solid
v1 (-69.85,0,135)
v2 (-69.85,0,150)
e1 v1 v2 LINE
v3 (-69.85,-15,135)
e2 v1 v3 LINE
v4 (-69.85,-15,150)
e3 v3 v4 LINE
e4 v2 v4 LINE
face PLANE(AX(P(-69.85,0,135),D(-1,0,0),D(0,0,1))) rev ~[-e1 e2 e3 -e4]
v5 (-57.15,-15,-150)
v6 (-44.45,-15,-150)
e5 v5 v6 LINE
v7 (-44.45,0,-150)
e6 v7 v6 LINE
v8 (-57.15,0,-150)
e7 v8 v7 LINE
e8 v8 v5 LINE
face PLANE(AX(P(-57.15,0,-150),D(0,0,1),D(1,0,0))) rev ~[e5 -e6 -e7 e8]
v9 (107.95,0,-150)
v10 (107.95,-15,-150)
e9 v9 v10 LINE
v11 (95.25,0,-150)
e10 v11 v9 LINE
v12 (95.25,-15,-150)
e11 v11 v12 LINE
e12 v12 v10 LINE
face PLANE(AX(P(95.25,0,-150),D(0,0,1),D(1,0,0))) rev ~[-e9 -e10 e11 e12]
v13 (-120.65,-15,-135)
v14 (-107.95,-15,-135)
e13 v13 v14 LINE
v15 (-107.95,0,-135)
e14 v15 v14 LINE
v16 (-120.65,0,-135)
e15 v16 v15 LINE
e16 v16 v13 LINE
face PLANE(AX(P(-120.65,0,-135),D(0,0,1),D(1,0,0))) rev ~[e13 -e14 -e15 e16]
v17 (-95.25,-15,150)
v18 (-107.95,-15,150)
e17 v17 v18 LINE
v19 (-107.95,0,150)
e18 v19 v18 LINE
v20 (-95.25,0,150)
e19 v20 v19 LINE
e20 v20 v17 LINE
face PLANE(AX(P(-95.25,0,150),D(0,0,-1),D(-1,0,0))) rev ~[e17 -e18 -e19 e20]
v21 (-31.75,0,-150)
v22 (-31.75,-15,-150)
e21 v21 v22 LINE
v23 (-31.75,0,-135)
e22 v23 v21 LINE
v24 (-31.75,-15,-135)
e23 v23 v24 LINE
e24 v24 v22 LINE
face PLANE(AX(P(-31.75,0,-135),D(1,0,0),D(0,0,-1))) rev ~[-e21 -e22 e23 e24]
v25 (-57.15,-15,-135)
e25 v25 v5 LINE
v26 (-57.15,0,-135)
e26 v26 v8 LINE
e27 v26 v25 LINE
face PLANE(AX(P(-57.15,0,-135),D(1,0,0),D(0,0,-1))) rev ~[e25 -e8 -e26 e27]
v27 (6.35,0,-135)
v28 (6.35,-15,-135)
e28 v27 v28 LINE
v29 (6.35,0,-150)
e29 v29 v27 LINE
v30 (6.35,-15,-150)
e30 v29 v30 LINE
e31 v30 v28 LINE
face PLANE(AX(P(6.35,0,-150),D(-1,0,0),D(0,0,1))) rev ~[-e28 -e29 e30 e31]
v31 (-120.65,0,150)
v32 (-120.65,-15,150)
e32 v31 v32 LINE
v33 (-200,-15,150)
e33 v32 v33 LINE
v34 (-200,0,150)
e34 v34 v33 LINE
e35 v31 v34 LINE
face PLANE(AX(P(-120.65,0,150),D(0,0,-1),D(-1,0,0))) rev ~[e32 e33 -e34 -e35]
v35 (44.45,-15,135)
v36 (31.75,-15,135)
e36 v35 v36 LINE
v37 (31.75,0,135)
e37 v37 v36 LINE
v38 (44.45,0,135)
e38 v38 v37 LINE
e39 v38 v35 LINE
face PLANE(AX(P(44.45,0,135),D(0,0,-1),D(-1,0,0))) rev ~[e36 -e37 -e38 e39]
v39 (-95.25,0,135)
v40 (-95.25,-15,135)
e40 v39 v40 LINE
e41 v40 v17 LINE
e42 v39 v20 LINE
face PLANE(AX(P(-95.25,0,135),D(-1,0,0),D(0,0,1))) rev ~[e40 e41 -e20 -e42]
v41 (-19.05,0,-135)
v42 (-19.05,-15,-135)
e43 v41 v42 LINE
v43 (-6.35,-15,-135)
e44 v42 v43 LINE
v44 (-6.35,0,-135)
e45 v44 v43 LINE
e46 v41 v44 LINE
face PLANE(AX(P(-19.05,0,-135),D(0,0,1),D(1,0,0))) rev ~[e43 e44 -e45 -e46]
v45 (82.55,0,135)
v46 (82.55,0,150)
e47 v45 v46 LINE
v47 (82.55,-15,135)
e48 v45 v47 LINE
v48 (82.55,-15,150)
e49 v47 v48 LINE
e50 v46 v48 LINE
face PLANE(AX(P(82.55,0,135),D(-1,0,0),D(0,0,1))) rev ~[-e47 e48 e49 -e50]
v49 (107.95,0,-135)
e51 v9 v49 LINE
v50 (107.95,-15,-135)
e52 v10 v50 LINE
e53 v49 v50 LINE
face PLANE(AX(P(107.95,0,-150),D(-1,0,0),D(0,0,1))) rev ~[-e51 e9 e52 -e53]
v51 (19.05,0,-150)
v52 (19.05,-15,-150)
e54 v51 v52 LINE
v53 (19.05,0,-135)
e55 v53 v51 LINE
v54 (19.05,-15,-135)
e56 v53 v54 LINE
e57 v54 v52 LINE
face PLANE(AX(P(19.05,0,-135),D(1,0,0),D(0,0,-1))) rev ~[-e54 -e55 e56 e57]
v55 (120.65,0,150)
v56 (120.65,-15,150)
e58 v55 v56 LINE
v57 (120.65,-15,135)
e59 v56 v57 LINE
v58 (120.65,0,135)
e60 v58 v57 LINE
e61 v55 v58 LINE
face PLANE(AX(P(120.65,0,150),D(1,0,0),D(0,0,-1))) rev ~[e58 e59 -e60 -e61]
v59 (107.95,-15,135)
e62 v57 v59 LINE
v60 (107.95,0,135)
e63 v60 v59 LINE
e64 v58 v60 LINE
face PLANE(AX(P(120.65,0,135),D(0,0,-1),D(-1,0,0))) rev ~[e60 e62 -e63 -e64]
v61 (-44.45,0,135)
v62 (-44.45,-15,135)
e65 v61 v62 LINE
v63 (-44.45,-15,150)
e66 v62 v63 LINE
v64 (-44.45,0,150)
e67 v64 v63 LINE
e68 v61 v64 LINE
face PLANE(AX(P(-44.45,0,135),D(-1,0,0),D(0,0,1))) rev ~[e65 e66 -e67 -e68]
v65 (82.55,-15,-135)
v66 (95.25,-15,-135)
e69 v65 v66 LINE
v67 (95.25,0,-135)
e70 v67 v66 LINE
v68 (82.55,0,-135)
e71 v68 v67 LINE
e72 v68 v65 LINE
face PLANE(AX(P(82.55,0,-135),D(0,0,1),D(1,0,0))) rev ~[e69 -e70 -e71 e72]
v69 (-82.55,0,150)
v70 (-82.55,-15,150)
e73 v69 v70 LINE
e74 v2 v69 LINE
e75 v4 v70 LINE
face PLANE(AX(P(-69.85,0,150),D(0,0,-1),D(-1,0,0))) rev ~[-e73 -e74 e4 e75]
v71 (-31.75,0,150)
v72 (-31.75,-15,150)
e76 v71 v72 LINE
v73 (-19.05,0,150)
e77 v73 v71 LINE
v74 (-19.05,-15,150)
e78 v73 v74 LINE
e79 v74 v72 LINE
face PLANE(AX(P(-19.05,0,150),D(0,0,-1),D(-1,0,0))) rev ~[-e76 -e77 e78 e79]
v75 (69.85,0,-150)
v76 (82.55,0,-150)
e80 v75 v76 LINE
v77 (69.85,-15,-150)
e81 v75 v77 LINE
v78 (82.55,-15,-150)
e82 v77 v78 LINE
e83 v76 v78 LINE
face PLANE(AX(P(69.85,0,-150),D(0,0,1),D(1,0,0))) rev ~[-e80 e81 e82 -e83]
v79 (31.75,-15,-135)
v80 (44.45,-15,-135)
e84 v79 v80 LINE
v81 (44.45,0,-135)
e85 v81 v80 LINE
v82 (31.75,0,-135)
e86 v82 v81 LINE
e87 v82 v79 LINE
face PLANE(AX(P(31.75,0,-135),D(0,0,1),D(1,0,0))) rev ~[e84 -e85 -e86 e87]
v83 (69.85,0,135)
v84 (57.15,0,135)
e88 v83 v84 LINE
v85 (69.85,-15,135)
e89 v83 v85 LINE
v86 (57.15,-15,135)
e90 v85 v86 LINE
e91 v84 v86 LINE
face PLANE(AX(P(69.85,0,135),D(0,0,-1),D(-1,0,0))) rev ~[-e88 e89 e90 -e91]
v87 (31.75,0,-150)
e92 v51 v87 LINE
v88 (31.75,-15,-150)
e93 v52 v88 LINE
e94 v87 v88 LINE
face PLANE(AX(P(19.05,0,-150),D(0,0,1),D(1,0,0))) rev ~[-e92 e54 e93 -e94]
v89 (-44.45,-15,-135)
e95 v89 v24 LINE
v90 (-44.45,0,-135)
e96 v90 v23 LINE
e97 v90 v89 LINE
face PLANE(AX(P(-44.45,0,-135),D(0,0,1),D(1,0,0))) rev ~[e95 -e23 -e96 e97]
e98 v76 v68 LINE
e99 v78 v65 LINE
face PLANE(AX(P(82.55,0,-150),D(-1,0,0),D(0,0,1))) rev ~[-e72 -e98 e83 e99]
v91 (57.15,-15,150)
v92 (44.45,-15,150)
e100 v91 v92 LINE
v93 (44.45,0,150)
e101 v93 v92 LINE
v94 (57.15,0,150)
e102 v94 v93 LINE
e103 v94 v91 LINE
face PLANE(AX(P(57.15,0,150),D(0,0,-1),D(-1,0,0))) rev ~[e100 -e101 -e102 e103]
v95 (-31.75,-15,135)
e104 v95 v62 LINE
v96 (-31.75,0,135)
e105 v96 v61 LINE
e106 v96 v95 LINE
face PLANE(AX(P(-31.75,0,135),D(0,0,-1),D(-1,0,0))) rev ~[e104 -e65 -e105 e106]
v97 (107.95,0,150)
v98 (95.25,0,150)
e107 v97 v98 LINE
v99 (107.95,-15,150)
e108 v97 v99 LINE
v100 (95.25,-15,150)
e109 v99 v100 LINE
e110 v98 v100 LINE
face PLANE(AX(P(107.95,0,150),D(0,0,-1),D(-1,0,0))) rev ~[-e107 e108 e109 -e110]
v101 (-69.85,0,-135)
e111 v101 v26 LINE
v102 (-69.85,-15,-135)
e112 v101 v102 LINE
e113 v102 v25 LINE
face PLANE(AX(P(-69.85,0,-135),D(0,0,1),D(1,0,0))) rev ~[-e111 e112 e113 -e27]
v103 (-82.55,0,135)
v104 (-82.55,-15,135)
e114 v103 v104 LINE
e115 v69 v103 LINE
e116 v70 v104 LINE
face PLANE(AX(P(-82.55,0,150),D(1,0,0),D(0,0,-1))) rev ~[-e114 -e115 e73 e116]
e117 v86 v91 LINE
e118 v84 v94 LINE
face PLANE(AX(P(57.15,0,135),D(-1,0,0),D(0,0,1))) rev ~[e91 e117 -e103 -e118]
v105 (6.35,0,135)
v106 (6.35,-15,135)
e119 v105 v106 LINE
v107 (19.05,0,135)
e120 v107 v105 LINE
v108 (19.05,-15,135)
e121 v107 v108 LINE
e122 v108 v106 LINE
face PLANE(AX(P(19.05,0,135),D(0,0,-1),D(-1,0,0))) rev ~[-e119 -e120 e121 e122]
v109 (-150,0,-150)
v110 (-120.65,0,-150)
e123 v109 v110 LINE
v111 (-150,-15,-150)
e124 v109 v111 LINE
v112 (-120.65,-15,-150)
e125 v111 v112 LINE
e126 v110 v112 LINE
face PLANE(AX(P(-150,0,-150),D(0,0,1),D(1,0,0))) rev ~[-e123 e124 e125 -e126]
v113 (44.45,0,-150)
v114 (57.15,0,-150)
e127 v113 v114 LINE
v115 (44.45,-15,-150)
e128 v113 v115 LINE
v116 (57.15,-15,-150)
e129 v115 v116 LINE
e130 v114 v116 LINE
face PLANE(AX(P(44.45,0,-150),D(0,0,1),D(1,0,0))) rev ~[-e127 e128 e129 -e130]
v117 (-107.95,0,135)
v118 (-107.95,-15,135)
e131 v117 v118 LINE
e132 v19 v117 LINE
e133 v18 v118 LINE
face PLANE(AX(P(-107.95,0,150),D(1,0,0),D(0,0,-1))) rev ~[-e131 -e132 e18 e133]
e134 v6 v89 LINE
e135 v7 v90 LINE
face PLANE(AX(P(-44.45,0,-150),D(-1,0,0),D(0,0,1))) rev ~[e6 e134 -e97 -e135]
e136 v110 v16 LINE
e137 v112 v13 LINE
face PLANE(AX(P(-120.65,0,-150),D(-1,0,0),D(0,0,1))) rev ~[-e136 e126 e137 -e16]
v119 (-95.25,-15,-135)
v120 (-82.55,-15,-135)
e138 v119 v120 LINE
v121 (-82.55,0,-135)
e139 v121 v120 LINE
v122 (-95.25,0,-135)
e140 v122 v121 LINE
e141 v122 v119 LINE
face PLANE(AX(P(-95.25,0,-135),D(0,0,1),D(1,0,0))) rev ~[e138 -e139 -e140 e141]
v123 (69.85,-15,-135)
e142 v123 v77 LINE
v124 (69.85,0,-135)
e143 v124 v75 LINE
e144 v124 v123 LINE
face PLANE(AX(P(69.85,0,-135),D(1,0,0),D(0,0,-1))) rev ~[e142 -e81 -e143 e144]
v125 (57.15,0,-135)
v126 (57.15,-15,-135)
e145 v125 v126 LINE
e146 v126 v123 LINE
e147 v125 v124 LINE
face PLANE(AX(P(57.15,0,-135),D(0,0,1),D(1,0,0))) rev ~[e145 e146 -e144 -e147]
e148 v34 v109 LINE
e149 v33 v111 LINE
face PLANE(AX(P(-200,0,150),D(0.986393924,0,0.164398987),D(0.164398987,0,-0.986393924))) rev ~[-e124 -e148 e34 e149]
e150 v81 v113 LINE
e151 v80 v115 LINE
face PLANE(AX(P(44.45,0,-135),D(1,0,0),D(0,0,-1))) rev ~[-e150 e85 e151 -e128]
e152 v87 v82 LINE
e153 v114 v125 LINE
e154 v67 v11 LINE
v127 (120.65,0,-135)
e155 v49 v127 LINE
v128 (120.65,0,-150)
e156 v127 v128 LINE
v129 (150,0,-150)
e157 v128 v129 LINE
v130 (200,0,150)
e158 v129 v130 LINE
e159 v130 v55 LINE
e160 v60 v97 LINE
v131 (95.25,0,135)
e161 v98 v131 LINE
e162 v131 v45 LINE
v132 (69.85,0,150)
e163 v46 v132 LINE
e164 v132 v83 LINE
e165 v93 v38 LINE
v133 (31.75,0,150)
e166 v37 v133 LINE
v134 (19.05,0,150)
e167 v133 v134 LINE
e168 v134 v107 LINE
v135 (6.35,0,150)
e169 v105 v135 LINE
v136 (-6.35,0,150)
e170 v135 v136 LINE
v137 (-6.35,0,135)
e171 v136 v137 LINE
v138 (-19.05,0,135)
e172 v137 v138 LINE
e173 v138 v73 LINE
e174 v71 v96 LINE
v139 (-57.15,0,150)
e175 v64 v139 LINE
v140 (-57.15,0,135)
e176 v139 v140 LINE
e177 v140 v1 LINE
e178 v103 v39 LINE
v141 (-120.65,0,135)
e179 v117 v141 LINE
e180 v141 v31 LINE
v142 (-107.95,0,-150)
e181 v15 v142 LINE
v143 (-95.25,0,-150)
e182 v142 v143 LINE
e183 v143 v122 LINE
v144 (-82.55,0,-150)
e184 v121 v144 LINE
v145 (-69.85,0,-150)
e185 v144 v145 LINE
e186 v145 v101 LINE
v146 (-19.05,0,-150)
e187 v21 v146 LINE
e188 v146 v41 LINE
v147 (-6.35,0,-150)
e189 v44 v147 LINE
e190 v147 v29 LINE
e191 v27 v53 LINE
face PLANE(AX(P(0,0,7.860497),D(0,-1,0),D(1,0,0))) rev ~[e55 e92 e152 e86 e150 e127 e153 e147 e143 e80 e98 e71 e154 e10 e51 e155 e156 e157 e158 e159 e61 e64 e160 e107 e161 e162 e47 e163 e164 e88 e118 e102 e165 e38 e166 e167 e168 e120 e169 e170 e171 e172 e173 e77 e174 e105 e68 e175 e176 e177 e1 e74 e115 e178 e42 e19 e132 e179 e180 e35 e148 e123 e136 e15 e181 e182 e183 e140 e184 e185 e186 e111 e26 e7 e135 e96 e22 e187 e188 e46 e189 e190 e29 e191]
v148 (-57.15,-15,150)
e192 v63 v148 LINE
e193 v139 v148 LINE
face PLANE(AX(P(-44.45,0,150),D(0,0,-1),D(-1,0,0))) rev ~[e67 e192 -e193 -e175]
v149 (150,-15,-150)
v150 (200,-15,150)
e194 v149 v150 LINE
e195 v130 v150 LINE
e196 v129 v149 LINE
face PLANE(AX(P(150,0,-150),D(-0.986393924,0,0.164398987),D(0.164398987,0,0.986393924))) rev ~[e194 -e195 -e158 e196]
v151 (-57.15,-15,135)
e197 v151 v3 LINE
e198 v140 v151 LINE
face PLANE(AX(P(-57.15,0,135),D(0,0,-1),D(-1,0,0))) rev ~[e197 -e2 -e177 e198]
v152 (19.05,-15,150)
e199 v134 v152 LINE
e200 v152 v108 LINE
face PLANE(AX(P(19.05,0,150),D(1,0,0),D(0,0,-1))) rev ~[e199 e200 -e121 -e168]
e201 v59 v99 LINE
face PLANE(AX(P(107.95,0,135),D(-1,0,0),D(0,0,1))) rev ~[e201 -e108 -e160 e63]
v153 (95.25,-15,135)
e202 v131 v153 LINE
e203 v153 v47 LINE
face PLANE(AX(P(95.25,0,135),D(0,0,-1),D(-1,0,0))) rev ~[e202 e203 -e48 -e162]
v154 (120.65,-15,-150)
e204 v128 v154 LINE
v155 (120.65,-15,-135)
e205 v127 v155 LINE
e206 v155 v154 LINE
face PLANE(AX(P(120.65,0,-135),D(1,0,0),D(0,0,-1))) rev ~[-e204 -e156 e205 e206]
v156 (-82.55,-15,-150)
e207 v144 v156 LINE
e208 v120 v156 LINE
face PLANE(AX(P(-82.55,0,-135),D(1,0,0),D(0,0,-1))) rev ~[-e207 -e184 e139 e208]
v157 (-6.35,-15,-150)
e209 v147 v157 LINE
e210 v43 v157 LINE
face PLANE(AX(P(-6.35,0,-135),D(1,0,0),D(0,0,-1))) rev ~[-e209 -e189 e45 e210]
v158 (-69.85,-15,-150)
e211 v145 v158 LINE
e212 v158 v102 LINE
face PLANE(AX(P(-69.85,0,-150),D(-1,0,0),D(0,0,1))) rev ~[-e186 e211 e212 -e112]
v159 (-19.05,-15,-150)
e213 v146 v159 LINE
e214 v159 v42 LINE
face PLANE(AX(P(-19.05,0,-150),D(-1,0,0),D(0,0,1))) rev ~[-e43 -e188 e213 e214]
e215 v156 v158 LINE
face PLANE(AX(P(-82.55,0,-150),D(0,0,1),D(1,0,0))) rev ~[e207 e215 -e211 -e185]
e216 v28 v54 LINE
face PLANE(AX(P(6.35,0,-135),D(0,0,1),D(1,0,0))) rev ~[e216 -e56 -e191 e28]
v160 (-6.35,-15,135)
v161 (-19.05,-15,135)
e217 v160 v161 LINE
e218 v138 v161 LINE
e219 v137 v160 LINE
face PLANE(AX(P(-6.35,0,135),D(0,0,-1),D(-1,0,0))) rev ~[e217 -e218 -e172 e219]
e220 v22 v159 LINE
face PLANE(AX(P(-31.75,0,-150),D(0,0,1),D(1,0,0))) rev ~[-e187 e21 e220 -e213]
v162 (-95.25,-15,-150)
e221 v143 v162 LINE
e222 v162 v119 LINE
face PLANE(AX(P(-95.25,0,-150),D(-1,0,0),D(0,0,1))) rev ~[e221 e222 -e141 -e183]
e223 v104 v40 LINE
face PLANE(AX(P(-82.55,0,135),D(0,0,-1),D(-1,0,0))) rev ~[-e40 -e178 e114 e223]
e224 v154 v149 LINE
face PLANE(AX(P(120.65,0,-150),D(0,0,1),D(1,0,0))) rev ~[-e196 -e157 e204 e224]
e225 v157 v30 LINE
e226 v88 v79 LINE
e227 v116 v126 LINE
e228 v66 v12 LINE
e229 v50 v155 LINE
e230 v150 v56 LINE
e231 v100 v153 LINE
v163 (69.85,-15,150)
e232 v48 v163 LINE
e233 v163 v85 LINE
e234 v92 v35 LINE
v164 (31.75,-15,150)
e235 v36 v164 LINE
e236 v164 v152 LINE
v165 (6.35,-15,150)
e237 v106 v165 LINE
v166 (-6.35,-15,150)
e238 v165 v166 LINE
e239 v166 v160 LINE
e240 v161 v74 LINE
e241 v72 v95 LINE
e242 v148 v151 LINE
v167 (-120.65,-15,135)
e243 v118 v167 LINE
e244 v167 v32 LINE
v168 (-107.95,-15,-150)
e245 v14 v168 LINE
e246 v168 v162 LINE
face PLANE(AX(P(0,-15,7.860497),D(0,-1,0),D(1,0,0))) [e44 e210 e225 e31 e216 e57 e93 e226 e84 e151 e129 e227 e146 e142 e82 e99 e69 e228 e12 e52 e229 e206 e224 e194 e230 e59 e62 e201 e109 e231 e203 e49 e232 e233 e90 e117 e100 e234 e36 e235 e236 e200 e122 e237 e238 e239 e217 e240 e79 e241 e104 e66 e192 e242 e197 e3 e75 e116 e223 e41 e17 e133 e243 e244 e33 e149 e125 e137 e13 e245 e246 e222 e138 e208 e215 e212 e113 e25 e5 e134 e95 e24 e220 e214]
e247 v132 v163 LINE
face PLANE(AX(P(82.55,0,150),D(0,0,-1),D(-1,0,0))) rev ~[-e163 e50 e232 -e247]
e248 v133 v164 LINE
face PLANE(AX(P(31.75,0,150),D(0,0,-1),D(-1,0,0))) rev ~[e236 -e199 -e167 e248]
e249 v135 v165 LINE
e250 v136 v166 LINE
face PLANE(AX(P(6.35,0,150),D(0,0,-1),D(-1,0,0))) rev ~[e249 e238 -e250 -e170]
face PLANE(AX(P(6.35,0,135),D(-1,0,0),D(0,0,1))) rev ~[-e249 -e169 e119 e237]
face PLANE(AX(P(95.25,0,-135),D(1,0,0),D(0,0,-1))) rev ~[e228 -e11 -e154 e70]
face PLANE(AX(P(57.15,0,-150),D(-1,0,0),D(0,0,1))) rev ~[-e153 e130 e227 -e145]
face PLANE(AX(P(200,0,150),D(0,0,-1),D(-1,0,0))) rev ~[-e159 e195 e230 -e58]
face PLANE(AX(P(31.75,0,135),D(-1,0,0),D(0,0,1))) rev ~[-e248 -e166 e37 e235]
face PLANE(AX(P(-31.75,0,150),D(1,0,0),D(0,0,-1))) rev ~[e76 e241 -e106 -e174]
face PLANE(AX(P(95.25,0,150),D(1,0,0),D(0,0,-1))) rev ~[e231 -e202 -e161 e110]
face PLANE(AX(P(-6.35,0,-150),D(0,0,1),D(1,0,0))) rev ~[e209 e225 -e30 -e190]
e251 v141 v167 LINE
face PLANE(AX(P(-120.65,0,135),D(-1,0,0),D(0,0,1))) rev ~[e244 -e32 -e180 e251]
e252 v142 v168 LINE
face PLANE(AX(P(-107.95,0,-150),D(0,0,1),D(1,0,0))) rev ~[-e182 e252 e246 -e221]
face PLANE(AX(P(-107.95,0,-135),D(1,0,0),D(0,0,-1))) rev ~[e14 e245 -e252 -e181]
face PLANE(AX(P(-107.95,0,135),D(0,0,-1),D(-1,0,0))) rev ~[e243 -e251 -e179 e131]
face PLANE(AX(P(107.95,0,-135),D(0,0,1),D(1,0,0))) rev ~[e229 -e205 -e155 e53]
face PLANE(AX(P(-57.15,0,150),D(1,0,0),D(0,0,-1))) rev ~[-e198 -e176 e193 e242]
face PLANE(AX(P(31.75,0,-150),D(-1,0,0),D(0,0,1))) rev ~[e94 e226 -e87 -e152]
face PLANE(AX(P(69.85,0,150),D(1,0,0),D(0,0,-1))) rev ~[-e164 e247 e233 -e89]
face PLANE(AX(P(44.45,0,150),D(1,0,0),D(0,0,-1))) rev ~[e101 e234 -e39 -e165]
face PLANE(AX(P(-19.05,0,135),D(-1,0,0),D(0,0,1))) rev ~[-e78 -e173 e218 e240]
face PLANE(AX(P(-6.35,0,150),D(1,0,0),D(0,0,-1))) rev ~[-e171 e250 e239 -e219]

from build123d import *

# Parameters (mm, degrees)
F1_DEPTH = 15


# Not quite as in the source:
# - a feature names something its author has since deleted; it is built from what else it names


with BuildPart() as f1:
    # F0 (on Front) → F1 (new body)
    with BuildSketch(Plane.XZ):
        Polygon((150, -150), (200, 150), (120.65, 150), (120.65, 135), (107.95, 135), (107.95, 150), (95.25, 150), (95.25, 135), (82.55, 135), (82.55, 150), (69.85, 150), (69.85, 135), (57.15, 135), (57.15, 150), (44.45, 150), (44.45, 135), (31.75, 135), (31.75, 150), (19.05, 150), (19.05, 135), (6.35, 135), (6.35, 150), (0, 150), (-6.35, 150), (-6.35, 135), (-19.05, 135), (-19.05, 150), (-31.75, 150), (-31.75, 135), (-44.45, 135), (-44.45, 150), (-57.15, 150), (-57.15, 135), (-69.85, 135), (-69.85, 150), (-82.55, 150), (-82.55, 135), (-95.25, 135), (-95.25, 150), (-107.95, 150), (-107.95, 135), (-120.65, 135), (-120.65, 150), (-200, 150), (-150, -150), (-120.65, -150), (-120.65, -135), (-107.95, -135), (-107.95, -150), (-95.25, -150), (-95.25, -135), (-82.55, -135), (-82.55, -150), (-69.85, -150), (-69.85, -135), (-57.15, -135), (-57.15, -150), (-44.45, -150), (-44.45, -135), (-31.75, -135), (-31.75, -150), (-19.05, -150), (-19.05, -135), (-6.35, -135), (-6.35, -150), (0, -150), (6.35, -150), (6.35, -135), (19.05, -135), (19.05, -150), (31.75, -150), (31.75, -135), (44.45, -135), (44.45, -150), (57.15, -150), (57.15, -135), (69.85, -135), (69.85, -150), (82.55, -150), (82.55, -135), (95.25, -135), (95.25, -150), (107.95, -150), (107.95, -135), (120.65, -135), (120.65, -150), align=None)
    extrude(amount=F1_DEPTH)


solid = f1.part
